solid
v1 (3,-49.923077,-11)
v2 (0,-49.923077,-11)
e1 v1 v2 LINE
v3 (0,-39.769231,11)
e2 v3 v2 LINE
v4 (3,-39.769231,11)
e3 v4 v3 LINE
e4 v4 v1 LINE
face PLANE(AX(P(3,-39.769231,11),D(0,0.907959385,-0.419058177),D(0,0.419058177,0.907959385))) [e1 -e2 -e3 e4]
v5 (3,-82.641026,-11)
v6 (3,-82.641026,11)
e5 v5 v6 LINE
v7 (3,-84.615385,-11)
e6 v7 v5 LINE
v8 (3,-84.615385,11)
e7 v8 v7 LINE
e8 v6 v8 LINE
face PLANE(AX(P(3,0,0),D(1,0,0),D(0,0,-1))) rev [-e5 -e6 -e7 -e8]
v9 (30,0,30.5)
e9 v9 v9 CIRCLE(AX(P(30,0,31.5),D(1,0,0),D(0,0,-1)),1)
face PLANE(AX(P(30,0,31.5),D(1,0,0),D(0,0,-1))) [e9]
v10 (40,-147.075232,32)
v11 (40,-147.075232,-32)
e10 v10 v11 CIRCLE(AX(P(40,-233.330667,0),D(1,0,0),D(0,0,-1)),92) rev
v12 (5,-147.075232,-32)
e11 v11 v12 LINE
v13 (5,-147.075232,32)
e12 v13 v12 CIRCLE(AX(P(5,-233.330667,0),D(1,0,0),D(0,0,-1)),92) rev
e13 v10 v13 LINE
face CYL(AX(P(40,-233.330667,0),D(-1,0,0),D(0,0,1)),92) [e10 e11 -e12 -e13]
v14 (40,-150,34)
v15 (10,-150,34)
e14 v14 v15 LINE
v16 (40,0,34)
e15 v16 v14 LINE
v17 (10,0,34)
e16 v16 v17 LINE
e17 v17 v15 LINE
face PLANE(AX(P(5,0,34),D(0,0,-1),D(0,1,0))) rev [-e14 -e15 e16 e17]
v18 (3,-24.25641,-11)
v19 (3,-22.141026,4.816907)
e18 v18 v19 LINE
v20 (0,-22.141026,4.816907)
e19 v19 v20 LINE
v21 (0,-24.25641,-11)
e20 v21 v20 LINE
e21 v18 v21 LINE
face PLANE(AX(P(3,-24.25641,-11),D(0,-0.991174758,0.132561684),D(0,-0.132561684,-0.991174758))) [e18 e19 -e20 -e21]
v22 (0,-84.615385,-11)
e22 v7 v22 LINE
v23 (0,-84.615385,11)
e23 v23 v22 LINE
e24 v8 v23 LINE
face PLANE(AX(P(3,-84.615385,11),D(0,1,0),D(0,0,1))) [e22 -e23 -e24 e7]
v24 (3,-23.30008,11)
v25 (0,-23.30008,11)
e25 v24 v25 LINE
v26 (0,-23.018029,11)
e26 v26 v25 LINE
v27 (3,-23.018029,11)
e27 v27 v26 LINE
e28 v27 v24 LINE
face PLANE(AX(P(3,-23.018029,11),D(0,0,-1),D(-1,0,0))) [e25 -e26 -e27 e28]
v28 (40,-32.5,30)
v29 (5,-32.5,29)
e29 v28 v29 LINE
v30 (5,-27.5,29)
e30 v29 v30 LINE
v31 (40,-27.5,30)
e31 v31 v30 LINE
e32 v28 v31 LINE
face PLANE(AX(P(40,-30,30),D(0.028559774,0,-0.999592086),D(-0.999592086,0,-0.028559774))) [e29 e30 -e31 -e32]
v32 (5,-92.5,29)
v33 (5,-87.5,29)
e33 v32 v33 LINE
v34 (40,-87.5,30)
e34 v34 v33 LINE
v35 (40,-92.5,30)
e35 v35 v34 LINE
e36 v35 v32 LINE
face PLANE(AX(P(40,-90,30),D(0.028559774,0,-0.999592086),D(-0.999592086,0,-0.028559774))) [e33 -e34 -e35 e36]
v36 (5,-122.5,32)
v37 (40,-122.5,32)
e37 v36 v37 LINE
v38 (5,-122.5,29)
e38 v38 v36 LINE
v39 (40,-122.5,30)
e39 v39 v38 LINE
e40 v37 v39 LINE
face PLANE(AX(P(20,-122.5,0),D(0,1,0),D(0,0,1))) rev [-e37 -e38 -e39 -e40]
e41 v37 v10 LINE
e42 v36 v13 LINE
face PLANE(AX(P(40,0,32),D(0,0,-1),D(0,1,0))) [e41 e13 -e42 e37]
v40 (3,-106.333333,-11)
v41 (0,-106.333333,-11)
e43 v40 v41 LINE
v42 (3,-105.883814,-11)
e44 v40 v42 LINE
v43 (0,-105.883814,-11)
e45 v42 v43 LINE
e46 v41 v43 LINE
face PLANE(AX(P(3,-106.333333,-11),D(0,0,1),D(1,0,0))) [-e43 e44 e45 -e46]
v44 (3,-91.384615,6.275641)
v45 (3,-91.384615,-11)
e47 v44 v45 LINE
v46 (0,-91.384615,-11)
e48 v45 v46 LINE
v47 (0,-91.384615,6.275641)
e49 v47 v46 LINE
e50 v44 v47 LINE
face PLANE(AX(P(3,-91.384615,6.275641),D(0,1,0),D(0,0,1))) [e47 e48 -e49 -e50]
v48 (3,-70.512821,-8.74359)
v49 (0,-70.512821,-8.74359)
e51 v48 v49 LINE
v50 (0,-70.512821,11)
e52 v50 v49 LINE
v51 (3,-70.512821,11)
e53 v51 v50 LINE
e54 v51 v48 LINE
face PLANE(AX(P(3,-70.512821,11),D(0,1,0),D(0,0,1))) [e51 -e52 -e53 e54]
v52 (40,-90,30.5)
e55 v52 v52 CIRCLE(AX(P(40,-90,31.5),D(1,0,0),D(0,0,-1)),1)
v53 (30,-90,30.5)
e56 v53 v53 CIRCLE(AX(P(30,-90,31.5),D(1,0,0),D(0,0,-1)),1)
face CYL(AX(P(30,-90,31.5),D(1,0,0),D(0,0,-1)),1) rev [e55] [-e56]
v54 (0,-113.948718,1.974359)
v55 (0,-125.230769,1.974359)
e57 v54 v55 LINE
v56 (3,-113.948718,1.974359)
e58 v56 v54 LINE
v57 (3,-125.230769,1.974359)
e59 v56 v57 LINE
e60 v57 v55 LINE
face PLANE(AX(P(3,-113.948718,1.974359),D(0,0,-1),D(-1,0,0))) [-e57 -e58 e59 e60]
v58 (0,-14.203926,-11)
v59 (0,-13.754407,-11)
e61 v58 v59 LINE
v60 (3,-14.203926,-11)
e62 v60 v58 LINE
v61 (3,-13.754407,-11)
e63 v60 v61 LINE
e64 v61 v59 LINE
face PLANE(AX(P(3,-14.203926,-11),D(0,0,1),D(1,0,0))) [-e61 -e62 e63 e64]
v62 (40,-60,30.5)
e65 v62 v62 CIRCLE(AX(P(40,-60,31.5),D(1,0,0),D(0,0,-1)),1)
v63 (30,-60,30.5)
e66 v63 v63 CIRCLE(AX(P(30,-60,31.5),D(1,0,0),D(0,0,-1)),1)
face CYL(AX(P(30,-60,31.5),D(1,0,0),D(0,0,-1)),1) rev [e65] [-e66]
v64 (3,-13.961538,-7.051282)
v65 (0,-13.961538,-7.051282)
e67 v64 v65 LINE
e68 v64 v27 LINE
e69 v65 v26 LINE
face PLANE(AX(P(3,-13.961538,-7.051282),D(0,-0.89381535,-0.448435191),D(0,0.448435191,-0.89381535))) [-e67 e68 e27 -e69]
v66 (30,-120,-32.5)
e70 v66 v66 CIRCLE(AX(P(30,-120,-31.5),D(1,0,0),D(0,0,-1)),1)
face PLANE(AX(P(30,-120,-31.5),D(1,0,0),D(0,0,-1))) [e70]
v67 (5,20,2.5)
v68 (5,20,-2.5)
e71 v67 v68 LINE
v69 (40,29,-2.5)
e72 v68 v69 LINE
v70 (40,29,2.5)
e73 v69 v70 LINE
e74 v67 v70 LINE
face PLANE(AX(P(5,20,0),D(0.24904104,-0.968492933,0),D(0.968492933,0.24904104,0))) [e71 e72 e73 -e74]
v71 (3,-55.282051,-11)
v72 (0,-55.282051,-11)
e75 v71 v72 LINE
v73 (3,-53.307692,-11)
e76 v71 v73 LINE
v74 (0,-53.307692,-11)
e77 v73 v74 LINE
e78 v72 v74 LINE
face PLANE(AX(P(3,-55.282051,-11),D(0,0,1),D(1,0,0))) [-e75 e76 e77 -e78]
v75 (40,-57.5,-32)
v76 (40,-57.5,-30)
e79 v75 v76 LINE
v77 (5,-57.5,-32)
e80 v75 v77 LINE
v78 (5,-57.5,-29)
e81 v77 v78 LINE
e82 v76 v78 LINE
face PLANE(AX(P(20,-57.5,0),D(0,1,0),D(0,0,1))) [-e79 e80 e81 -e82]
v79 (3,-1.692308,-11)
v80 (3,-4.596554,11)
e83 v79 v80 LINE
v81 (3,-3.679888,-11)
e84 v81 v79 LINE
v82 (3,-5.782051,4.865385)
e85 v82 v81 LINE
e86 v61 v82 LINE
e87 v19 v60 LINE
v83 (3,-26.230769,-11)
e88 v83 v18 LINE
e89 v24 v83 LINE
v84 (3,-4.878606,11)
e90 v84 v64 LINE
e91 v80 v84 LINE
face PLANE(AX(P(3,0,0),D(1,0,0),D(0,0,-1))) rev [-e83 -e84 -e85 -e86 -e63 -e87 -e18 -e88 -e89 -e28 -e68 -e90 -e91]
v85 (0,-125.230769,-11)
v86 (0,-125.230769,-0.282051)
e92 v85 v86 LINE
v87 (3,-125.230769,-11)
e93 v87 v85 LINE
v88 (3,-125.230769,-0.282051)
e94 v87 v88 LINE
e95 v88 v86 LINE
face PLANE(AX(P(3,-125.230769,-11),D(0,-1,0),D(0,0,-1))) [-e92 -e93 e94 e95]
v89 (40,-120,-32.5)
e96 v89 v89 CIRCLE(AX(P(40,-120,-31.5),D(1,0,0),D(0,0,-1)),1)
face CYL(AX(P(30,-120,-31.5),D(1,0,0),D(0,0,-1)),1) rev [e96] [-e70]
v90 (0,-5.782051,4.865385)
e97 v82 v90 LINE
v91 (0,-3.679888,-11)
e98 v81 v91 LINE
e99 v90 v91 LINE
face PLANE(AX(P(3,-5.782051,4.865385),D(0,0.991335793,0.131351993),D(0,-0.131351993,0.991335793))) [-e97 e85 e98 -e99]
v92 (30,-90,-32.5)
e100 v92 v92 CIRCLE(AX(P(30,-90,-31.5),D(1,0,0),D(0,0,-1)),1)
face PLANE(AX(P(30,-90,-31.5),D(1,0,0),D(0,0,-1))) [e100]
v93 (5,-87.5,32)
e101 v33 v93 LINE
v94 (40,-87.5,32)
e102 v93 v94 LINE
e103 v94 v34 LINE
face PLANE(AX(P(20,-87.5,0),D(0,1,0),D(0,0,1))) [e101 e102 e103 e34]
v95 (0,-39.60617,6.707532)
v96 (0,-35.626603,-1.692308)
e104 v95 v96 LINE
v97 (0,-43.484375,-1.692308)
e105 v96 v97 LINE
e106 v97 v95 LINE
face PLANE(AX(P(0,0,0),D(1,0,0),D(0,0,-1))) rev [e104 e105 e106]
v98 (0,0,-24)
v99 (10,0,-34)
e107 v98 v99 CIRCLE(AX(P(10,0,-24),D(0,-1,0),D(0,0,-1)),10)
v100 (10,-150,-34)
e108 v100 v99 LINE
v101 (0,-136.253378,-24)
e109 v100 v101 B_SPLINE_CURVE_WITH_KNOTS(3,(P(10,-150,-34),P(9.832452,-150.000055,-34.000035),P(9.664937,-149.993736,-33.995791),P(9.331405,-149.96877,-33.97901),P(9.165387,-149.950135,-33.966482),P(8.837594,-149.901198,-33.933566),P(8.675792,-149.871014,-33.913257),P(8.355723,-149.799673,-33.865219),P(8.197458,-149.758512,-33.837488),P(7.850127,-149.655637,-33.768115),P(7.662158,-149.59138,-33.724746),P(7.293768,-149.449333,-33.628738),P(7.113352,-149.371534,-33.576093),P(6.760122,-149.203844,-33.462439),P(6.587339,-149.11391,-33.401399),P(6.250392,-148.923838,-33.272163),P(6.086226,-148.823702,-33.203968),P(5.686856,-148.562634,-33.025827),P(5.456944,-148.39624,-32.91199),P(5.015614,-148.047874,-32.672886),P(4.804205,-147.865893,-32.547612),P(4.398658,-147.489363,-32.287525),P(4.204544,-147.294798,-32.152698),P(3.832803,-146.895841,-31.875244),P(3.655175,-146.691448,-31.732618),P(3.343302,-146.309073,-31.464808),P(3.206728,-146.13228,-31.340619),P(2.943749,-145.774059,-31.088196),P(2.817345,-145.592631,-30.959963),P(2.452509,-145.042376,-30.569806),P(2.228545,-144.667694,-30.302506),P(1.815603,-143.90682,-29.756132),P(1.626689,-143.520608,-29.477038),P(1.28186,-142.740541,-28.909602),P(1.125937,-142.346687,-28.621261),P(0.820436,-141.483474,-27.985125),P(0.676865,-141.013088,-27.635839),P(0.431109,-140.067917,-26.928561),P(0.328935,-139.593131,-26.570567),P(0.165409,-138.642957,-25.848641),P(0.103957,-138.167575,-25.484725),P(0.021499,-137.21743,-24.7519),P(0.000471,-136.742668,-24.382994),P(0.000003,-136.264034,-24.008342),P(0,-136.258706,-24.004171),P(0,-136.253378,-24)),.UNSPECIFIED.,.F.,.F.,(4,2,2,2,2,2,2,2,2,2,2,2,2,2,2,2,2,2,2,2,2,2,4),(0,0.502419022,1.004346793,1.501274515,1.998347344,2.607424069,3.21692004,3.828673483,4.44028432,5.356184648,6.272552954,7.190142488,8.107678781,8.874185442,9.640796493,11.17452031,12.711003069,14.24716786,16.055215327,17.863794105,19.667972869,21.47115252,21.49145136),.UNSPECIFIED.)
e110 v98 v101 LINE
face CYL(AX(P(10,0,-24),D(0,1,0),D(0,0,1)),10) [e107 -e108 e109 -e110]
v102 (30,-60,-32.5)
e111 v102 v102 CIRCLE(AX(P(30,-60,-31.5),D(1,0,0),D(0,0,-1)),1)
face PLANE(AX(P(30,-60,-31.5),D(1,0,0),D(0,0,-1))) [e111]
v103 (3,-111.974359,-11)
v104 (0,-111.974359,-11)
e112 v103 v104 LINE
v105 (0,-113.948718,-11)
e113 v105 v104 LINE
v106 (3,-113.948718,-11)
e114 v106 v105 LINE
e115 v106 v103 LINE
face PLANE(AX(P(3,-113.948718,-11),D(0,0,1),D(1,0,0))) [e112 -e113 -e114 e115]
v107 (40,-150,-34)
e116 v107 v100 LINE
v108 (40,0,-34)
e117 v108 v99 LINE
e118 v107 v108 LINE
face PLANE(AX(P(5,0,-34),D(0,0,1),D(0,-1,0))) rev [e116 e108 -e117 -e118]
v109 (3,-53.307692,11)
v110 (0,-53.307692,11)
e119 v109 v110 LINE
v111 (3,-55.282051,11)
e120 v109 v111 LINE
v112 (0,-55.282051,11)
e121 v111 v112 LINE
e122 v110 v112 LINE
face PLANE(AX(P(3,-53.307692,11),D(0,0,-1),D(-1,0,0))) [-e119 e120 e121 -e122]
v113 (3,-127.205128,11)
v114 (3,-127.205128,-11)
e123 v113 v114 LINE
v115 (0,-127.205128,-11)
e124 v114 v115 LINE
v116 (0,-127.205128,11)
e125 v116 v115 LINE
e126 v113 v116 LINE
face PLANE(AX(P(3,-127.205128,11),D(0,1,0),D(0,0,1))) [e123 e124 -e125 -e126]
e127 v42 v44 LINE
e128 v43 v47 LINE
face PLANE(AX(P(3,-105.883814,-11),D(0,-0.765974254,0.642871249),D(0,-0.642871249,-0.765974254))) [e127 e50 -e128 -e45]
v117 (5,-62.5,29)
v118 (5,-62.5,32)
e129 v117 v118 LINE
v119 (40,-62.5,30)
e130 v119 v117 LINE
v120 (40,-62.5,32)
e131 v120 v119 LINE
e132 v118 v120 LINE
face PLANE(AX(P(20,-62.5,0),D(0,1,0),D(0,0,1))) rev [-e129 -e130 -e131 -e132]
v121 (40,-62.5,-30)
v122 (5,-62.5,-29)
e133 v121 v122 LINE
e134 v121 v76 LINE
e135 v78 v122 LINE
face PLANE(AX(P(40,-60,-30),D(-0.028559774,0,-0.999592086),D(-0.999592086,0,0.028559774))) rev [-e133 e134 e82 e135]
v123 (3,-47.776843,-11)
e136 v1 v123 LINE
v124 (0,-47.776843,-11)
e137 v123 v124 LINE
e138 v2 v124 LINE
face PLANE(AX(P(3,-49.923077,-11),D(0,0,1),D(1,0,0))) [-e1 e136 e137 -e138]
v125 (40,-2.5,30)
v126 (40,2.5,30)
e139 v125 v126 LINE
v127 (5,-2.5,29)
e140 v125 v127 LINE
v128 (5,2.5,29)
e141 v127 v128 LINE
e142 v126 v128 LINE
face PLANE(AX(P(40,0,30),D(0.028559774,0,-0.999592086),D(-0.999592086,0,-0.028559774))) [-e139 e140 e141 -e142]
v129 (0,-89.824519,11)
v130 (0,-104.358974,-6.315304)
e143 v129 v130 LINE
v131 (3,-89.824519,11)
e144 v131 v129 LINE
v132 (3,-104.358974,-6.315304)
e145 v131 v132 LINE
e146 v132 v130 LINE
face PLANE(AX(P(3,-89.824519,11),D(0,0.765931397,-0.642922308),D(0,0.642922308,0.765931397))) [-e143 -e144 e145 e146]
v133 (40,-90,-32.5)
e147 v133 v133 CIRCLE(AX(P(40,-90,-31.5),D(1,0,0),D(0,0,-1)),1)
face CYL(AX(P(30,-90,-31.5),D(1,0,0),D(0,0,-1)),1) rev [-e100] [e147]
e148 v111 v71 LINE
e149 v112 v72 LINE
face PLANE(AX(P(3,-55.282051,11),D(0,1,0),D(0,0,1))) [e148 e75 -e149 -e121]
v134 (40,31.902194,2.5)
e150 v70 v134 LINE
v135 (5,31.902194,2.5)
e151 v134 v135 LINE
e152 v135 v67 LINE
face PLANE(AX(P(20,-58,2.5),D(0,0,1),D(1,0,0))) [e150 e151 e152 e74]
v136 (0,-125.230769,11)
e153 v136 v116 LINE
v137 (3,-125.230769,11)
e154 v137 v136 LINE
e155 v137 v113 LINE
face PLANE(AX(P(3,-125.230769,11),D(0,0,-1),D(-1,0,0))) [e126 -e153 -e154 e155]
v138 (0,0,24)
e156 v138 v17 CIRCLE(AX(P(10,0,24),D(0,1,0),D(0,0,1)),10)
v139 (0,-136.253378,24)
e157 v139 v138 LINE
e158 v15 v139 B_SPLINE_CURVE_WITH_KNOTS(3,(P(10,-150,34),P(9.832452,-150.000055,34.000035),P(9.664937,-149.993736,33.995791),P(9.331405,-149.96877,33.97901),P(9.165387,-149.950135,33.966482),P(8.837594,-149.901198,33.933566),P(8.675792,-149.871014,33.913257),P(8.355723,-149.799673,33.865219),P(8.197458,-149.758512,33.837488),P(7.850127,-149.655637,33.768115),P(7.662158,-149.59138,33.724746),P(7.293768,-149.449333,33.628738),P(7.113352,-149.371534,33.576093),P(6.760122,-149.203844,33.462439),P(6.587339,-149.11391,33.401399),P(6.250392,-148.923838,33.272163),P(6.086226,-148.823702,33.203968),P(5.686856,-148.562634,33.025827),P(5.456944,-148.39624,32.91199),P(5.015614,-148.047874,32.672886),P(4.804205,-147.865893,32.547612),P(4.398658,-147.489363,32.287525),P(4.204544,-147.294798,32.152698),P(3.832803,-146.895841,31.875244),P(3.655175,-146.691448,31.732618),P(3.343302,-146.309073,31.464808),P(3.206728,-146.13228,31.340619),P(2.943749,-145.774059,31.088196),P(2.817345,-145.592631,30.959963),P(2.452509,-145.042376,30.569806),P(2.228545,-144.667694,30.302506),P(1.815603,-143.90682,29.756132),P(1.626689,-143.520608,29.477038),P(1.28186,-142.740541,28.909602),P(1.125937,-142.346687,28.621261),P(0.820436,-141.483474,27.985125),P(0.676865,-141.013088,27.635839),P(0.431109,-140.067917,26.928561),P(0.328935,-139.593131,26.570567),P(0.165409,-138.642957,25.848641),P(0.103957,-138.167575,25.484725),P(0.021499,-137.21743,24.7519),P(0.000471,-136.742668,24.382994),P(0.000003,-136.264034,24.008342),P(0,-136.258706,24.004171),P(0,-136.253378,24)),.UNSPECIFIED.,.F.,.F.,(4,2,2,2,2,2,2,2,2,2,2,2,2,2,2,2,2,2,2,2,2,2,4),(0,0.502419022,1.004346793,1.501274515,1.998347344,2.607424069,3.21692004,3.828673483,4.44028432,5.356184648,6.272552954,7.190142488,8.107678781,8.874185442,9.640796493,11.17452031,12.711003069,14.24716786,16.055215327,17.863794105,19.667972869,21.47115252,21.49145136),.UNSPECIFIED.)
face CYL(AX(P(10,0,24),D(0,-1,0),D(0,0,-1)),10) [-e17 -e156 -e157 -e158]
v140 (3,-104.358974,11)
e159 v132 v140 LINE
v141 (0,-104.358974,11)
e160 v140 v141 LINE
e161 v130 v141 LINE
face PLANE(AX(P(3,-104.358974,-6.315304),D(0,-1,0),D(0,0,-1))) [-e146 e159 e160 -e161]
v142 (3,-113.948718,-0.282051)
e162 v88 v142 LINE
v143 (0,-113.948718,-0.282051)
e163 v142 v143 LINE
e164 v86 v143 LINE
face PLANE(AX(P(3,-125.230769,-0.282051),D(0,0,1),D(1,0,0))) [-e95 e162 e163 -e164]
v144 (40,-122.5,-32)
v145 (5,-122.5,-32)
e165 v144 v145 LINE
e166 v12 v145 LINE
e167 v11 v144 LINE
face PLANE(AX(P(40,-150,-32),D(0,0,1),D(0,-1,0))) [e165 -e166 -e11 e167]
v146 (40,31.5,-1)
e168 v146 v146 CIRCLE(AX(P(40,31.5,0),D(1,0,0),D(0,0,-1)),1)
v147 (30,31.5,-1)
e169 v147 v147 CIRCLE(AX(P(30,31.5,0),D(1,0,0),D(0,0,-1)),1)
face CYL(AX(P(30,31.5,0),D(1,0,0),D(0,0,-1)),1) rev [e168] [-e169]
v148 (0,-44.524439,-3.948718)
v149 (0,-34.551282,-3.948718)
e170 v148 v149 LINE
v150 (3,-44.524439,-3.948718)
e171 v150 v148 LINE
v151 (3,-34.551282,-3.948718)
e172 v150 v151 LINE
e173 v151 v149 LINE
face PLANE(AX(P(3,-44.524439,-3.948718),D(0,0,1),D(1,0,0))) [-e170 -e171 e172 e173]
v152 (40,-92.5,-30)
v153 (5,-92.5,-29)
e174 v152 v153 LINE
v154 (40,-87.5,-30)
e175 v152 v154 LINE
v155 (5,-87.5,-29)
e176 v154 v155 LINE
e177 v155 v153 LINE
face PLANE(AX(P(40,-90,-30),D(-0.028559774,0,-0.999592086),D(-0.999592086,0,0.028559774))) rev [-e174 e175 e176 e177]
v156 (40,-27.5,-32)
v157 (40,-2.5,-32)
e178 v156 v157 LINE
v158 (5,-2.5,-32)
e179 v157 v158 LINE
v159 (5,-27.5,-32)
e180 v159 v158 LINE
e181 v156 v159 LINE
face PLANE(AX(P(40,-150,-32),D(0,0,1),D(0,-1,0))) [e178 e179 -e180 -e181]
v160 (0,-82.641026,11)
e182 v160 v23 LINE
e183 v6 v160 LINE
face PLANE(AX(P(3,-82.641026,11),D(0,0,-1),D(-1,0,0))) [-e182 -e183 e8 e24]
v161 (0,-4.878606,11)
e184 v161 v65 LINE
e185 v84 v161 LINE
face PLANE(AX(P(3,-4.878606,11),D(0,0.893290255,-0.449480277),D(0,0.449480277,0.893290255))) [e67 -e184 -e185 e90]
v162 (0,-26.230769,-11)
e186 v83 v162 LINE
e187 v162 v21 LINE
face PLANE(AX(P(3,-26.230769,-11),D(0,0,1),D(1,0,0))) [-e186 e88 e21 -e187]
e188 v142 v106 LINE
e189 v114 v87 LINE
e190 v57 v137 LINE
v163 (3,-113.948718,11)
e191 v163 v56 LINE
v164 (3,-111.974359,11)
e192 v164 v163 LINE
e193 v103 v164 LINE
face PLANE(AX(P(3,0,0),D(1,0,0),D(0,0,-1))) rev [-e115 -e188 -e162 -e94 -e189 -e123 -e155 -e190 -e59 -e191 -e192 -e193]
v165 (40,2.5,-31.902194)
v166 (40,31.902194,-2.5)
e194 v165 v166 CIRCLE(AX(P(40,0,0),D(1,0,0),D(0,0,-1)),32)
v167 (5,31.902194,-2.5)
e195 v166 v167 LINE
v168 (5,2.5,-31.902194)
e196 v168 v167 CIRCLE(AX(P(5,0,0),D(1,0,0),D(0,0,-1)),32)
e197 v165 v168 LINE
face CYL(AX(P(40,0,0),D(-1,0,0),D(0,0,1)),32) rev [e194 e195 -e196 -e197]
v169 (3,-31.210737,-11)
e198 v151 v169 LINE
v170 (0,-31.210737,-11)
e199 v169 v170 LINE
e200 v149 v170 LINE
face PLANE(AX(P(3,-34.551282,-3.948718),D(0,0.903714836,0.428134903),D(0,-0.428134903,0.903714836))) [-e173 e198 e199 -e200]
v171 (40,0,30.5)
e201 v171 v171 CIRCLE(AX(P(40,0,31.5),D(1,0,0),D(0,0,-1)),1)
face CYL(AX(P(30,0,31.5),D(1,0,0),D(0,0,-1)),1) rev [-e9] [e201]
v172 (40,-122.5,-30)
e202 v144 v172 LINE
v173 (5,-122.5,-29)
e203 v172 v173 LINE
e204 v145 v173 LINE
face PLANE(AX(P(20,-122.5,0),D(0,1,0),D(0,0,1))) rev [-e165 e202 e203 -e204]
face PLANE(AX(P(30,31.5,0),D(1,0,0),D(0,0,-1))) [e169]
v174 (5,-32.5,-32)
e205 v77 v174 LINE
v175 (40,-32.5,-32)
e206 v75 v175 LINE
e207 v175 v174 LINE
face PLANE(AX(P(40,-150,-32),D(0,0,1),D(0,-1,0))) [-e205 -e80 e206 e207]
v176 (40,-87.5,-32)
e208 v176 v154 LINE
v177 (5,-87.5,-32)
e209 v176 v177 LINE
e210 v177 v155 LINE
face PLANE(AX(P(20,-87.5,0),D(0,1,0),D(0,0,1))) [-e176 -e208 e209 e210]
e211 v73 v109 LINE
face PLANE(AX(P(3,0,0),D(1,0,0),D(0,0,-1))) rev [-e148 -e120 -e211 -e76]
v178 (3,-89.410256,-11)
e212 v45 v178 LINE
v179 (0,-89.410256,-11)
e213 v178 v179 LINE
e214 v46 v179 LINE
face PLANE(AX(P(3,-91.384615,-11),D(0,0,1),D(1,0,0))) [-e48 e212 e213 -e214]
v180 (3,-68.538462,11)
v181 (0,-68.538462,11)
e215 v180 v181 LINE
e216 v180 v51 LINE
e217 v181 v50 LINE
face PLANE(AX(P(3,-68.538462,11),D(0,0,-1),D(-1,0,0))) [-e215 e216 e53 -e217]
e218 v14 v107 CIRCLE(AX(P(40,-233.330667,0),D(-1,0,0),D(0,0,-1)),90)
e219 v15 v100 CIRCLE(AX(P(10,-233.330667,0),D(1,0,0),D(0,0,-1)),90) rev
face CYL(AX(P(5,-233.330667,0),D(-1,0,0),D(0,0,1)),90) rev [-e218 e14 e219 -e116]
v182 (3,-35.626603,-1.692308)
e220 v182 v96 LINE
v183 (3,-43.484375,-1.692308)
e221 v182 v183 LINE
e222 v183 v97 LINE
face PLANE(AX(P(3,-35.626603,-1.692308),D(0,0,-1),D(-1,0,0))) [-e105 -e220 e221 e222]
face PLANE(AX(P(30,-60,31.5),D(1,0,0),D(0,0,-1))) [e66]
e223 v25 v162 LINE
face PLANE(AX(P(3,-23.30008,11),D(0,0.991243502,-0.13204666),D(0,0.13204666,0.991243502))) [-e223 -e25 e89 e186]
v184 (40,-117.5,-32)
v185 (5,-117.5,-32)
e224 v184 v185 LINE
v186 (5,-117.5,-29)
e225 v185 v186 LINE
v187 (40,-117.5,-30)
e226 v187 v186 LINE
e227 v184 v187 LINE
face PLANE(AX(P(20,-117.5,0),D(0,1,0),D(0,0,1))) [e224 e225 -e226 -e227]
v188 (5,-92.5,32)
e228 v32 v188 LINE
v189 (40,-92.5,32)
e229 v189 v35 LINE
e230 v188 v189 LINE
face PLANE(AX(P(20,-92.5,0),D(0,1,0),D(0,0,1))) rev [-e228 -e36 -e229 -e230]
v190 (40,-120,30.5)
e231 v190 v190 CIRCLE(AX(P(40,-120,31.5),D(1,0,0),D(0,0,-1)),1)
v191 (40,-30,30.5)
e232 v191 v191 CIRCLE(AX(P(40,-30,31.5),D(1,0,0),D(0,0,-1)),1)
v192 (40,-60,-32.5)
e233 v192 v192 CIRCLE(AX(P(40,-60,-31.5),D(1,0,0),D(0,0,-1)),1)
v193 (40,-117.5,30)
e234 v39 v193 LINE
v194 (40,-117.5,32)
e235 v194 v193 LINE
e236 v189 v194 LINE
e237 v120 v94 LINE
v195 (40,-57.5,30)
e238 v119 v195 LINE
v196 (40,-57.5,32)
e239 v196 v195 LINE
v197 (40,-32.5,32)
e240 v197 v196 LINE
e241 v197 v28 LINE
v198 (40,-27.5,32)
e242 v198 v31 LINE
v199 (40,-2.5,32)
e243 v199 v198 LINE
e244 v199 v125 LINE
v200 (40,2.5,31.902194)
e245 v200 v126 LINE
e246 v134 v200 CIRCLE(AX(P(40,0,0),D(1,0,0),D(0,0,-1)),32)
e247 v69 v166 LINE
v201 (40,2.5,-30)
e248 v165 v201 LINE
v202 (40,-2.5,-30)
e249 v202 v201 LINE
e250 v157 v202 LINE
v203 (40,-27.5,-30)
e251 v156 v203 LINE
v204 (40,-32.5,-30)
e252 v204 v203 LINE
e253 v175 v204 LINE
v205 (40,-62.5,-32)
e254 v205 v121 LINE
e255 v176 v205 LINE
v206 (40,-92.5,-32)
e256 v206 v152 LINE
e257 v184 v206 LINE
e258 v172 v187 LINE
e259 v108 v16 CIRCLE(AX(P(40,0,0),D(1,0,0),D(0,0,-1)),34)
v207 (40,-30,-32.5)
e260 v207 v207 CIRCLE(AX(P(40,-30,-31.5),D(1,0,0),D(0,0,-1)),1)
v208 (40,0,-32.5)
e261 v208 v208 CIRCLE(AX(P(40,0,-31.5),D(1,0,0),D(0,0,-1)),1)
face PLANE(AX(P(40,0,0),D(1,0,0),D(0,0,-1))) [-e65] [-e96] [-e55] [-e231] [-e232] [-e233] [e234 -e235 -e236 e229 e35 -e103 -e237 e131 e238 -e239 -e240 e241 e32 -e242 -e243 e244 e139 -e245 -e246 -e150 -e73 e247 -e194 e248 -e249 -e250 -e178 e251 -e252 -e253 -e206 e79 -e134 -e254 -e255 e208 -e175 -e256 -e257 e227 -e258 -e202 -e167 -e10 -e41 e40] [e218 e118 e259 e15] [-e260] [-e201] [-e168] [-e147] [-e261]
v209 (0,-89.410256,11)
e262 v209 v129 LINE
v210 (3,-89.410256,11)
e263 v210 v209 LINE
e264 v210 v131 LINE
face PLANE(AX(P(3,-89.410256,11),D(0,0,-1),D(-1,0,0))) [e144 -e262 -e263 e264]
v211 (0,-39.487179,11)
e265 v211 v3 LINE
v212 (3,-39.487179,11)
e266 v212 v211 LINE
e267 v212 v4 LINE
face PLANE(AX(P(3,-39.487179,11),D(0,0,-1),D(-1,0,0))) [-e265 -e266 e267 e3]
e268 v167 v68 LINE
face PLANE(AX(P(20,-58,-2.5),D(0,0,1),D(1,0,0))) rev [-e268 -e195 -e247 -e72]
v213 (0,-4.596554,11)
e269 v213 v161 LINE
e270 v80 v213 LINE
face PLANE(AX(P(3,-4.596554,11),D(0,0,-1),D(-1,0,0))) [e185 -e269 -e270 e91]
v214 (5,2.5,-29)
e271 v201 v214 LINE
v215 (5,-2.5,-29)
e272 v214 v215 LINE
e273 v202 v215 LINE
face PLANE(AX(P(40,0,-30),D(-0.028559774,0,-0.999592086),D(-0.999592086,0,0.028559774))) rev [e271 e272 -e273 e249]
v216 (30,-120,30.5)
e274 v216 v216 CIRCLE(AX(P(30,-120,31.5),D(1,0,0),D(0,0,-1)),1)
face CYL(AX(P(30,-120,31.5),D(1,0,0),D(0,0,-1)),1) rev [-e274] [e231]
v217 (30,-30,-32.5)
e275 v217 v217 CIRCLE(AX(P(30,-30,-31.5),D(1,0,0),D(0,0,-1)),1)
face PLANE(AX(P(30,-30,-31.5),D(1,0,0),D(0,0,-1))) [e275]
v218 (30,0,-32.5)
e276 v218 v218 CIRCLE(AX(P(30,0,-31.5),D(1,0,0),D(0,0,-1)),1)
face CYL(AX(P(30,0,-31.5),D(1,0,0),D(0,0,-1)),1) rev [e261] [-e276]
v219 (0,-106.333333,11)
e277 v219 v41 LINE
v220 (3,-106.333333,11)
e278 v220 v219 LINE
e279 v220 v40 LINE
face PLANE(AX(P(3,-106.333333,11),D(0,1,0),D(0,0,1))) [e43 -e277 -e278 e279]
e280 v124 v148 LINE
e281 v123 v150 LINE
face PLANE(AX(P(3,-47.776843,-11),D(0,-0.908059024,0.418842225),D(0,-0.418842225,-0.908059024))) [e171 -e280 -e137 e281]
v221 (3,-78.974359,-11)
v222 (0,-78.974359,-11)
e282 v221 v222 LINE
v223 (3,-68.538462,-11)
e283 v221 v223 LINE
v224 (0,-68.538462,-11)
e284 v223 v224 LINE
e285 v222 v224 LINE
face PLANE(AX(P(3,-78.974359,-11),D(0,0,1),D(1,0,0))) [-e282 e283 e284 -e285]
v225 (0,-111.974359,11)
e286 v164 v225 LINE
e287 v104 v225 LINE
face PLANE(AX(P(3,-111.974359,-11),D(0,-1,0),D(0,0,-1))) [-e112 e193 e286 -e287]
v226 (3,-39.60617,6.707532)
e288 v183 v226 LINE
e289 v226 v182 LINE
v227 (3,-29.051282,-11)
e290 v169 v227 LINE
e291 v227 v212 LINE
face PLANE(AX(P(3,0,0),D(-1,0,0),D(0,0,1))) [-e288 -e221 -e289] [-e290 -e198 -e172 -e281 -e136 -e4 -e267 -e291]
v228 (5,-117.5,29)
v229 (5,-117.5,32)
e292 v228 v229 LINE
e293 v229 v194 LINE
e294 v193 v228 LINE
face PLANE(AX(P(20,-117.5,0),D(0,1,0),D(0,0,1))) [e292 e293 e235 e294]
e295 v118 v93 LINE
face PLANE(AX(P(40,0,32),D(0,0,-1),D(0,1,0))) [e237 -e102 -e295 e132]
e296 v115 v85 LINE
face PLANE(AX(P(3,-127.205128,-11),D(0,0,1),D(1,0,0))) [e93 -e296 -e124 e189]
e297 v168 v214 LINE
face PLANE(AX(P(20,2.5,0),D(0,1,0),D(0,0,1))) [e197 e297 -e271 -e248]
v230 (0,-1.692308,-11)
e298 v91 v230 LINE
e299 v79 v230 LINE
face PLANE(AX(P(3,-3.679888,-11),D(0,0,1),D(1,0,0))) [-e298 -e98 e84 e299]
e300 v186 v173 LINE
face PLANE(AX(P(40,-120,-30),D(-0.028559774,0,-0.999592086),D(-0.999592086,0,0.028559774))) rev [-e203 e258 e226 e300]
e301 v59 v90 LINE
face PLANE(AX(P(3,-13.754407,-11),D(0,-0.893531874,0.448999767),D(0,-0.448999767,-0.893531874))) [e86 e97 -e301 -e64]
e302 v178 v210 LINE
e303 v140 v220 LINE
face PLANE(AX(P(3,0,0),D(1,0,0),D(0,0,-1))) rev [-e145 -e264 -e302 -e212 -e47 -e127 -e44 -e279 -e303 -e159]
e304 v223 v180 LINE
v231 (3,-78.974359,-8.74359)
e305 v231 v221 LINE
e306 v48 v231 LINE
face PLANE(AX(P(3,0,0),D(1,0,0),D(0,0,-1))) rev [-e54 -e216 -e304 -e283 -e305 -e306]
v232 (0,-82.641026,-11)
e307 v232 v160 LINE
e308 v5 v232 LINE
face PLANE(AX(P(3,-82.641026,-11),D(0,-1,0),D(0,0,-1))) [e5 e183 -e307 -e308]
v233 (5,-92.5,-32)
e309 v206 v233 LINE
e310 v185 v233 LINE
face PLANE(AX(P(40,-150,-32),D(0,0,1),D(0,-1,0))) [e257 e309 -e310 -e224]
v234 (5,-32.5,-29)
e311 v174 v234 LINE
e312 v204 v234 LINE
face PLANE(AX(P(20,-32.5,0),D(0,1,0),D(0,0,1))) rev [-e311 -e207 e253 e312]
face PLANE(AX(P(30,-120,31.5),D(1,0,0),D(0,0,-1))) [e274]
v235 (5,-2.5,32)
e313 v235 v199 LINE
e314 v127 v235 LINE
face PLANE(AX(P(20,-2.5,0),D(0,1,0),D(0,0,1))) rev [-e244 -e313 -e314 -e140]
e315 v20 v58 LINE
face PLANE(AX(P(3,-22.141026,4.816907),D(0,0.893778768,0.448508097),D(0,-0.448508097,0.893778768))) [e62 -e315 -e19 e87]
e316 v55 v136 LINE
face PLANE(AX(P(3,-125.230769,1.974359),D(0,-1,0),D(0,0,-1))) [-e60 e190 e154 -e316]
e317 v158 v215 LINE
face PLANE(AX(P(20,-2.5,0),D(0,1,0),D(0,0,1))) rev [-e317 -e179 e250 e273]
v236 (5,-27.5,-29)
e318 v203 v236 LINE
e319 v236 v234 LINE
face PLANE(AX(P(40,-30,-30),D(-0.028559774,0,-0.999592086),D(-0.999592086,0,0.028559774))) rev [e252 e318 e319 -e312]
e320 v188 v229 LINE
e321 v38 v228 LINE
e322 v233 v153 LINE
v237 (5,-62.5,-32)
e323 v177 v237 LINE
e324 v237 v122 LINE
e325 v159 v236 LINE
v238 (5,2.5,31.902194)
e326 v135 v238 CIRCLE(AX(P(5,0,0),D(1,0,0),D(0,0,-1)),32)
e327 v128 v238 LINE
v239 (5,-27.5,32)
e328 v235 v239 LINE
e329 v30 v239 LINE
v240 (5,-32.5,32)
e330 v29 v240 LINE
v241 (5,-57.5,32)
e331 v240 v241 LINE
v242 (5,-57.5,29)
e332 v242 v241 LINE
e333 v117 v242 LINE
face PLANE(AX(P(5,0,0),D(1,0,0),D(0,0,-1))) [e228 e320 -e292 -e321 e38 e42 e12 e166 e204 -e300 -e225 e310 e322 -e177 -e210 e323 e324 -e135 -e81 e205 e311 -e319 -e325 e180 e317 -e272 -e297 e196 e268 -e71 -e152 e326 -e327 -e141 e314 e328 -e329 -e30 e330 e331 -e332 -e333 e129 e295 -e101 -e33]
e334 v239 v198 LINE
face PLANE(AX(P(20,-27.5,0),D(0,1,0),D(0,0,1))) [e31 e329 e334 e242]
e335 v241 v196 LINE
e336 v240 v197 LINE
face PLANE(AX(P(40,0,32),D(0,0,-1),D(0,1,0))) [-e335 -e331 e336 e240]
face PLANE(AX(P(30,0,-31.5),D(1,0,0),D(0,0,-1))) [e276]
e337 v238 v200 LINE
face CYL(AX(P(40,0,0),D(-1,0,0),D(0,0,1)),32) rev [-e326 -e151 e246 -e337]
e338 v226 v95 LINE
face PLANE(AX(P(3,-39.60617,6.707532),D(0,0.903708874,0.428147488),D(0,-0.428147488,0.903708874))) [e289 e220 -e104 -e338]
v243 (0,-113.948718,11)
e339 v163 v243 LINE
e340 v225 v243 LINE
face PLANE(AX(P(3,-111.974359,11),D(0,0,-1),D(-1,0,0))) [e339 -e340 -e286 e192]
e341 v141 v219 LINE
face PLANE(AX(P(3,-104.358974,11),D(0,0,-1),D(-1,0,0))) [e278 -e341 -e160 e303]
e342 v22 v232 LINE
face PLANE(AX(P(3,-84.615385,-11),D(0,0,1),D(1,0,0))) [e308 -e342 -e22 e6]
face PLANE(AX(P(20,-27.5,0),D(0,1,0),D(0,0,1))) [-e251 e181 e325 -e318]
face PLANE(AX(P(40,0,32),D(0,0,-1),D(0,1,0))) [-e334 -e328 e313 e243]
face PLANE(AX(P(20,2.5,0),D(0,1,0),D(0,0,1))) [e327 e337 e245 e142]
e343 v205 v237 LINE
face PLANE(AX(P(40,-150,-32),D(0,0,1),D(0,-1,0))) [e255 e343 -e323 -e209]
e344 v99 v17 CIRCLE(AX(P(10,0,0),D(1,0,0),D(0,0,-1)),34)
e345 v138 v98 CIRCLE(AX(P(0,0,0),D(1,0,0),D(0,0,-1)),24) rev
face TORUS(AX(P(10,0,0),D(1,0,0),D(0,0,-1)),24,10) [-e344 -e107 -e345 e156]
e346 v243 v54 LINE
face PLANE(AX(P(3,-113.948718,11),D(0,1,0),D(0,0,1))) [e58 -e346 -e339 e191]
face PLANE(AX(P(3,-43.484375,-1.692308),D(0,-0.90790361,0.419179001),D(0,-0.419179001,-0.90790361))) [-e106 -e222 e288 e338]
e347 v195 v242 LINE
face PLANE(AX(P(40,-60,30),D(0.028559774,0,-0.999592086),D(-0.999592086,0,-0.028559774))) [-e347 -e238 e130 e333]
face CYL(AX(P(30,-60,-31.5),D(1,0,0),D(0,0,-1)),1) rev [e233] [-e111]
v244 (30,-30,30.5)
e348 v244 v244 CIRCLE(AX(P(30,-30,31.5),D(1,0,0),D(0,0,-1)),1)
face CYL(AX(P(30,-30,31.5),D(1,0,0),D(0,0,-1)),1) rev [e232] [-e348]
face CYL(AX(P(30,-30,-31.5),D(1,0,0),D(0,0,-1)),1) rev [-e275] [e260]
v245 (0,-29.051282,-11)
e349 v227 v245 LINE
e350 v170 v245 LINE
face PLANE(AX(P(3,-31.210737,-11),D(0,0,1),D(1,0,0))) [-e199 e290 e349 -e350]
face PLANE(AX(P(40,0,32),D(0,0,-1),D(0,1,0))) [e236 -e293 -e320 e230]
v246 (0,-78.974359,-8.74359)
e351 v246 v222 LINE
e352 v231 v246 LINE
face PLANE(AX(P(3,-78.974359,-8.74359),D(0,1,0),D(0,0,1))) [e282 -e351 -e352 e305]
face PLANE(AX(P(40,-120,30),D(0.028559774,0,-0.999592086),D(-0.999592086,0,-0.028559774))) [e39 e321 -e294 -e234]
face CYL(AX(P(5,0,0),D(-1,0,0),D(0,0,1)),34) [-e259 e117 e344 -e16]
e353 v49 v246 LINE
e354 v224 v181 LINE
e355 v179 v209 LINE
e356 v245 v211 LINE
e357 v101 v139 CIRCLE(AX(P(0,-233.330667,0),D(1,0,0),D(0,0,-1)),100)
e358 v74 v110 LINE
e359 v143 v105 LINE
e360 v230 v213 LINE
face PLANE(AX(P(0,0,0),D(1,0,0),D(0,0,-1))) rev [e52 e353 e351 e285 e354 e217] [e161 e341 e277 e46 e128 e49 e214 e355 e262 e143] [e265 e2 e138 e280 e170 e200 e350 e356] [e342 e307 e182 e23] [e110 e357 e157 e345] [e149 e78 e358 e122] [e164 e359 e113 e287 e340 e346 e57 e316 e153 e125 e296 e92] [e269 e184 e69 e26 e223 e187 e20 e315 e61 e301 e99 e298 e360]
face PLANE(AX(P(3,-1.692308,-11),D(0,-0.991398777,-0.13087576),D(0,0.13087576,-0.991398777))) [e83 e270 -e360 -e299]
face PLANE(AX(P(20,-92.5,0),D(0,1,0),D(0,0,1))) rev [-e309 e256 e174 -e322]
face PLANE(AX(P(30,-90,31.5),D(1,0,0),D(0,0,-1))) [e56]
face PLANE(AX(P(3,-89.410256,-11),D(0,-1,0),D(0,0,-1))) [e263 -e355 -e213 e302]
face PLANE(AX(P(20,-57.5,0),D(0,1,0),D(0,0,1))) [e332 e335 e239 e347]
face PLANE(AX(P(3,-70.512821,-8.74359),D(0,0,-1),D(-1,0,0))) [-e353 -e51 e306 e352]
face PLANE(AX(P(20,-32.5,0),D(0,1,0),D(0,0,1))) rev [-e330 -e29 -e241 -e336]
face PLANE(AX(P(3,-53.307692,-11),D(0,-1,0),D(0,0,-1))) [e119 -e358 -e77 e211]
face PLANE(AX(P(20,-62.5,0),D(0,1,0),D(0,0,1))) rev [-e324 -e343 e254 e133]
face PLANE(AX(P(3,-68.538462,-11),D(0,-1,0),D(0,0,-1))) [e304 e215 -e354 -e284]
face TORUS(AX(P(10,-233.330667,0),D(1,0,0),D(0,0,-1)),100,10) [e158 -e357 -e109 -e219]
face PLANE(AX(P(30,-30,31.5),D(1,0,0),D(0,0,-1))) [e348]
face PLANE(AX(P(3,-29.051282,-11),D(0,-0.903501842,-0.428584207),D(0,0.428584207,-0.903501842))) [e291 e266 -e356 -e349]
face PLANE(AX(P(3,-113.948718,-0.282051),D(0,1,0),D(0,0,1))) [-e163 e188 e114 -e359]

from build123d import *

# Parameters (mm, degrees)
BOSS_EXTRUDE3_DEPTH  = 5
EXTRUDE_THIN3_DEPTH  = 35
RIB3_START           = -2.5
RIB3_DEPTH           = 5
RIB13_START          = -2.5
RIB13_DEPTH          = 5
LPATTERN1_COUNT      = 5
LPATTERN1_PITCH      = 30
MIRROR1_START        = -2.5
MIRROR1_COPY_1_DEPTH = 5
MIRROR1_COPY_2_DEPTH = 5
MIRROR1_COPY_3_DEPTH = 5
MIRROR1_COPY_4_DEPTH = 5
CUT_EXTRUDE1_START   = -40
SKETCH11_R           = 1
CUT_EXTRUDE1_DEPTH   = 10
FILLET2_R            = 10
SKETCH12_W           = 22
SKETCH12_H           = 1.974358974
CUT_EXTRUDE2_DEPTH   = 3


# Read off the part's stored shape, not the designer's step: Rib3, Rib13
with BuildPart() as part:
    # Sketch7 → Boss-Extrude3 (new body)
    with BuildSketch(Plane(origin=(0, 0, 0), x_dir=(0, 0, -1), z_dir=(1, 0, 0))):
        with BuildLine():
            Line((-34, 0), (-34, -150))
            ThreePointArc((-34, -150), (0, -143.330666624), (34, -150))
            Line((34, -150), (34, 0))
            ThreePointArc((34, 0), (0, 34), (-34, 0))
        make_face()
    extrude(amount=BOSS_EXTRUDE3_DEPTH)

    # Sketch10 → Extrude-Thin3 (add)
    with BuildSketch(Plane(origin=(5, 0, 0), x_dir=(0, 0, -1), z_dir=(1, 0, 0))):
        with BuildLine():
            Line((34, -150), (34, 0))
            ThreePointArc((34, 0), (0, 34), (-34, 0))
            Line((-34, 0), (-34, -150))
            ThreePointArc((-34, -150), (0, -143.330666624), (34, -150))
        make_face()
        with BuildLine():
            Line((32, -147.075232013), (32, 0))
            ThreePointArc((32, 0), (0, 32), (-32, 0))
            Line((-32, 0), (-32, -147.075232013))
            ThreePointArc((-32, -147.075232013), (0, -141.330666624), (32, -147.075232013))
        make_face(mode=Mode.SUBTRACT)
    extrude(amount=EXTRUDE_THIN3_DEPTH)

    # Rib3 outline → Rib3 (add)
    with BuildSketch(Plane.XY.offset(RIB3_START)):
        Polygon((5, 20), (40, 29), (40, 33), (4, 33), (4, 19.742857143), align=None)
    extrude(amount=RIB3_DEPTH)

    # Rib13 outline → Rib13 (add)
    with BuildSketch(Plane(origin=(0, 0, 0), x_dir=(1, 0, 0), z_dir=(0, 1, 0)).offset(RIB13_START)):
        Polygon((5, -32), (40, -32), (40, -30), (5, -29), align=None)
    rib13 = extrude(amount=RIB13_DEPTH)

    # LPattern1: Rib13 ×5
    with Locations(*[(0, -i * LPATTERN1_PITCH, 0) for i in range(1, LPATTERN1_COUNT)]):
        add(rib13)

    # Mirror1: Rib13 across plane
    add(rib13.mirror(Plane.XY))

    # Mirror1 copy 1 sketch → Mirror1 copy 1 (add)
    with BuildSketch(Plane(origin=(0, -30, 0), x_dir=(1, 0, 0), z_dir=(0, 1, 0)).offset(MIRROR1_START)):
        Polygon((5, 32), (40, 32), (40, 30), (5, 29), align=None)
    extrude(amount=MIRROR1_COPY_1_DEPTH)

    # Mirror1 copy 2 sketch → Mirror1 copy 2 (add)
    with BuildSketch(Plane(origin=(0, -60, 0), x_dir=(1, 0, 0), z_dir=(0, 1, 0)).offset(MIRROR1_START)):
        Polygon((5, 32), (40, 32), (40, 30), (5, 29), align=None)
    extrude(amount=MIRROR1_COPY_2_DEPTH)

    # Mirror1 copy 3 sketch → Mirror1 copy 3 (add)
    with BuildSketch(Plane(origin=(0, -90, 0), x_dir=(1, 0, 0), z_dir=(0, 1, 0)).offset(MIRROR1_START)):
        Polygon((5, 32), (40, 32), (40, 30), (5, 29), align=None)
    extrude(amount=MIRROR1_COPY_3_DEPTH)

    # Mirror1 copy 4 sketch → Mirror1 copy 4 (add)
    with BuildSketch(Plane(origin=(0, -120, 0), x_dir=(1, 0, 0), z_dir=(0, 1, 0)).offset(MIRROR1_START)):
        Polygon((5, 32), (40, 32), (40, 30), (5, 29), align=None)
    extrude(amount=MIRROR1_COPY_4_DEPTH)

    # Sketch11 → Cut-Extrude1 (cut)
    with BuildSketch(Plane.ZY.offset(CUT_EXTRUDE1_START)):
        with Locations(Location((-31.5, 0, 0), (0, 0, 180))):
            Circle(SKETCH11_R)
        with Locations(Location((31.5, 0, 0), (0, 0, 180))):
            Circle(SKETCH11_R)
        with Locations(Location((-31.5, -30, 0), (0, 0, 180))):
            Circle(SKETCH11_R)
        with Locations(Location((31.5, -30, 0), (0, 0, 180))):
            Circle(SKETCH11_R)
        with Locations(Location((-31.5, -60, 0), (0, 0, 180))):
            Circle(SKETCH11_R)
        with Locations(Location((31.5, -60, 0), (0, 0, 180))):
            Circle(SKETCH11_R)
        with Locations(Location((-31.5, -90, 0), (0, 0, 180))):
            Circle(SKETCH11_R)
        with Locations(Location((31.5, -90, 0), (0, 0, 180))):
            Circle(SKETCH11_R)
        with Locations(Location((-31.5, -120, 0), (0, 0, 180))):
            Circle(SKETCH11_R)
        with Locations(Location((31.5, -120, 0), (0, 0, 180))):
            Circle(SKETCH11_R)
        with Locations(Location((0, 31.5, 0), (0, 0, 180))):
            Circle(SKETCH11_R)
    extrude(amount=CUT_EXTRUDE1_DEPTH, mode=Mode.SUBTRACT)

    # Fillet2
    fillet2_edges = [part.edges().sort_by_distance(p)[0] for p in [
        (0, -75, -34),
        (0, -143.330666624, 0),
        (0, -75, 34),
        (0, 34, 0),
    ]]
    fillet(fillet2_edges, radius=FILLET2_R)

    # Sketch12 → Cut-Extrude2 (cut)
    # profile 1 of 7: a face of its own
    with BuildSketch(Plane.ZY):
        Polygon((-11, -1.692307692), (11, -4.596554487), (11, -4.878605769), (-7.051282051, -13.961538462), (11, -23.018028846), (11, -23.300080128), (-11, -26.230769231), (-11, -24.256410256), (4.816907051, -22.141025641), (-11, -14.203926282), (-11, -13.754407051), (4.865384615, -5.782051282), (-11, -3.679887821), align=None)
    # profile 2 of 7: a face of its own
    with BuildSketch(Plane.ZY):
        Polygon((11, -39.769230769), (-11, -49.923076923), (-11, -47.776842949), (-3.948717949, -44.524439103), (-3.948717949, -34.551282051), (-11, -31.210737179), (-11, -29.051282051), (11, -39.487179487), align=None)
        Polygon((6.707532051, -39.606169872), (-1.692307692, -35.626602564), (-1.692307692, -43.484375), align=None, mode=Mode.SUBTRACT)
    # profile 3 of 7: a face of its own
    with BuildSketch(Plane.ZY):
        with Locations((0, -54.294871795)):
            Rectangle(SKETCH12_W, SKETCH12_H)
    # profile 4 of 7: a face of its own
    with BuildSketch(Plane.ZY):
        Polygon((11, -68.538461538), (11, -70.512820513), (-8.743589744, -70.512820513), (-8.743589744, -78.974358974), (-11, -78.974358974), (-11, -68.538461538), align=None)
    # profile 5 of 7: a face of its own
    with BuildSketch(Plane.ZY):
        with Locations((0, -83.628205128)):
            Rectangle(SKETCH12_W, SKETCH12_H)
    # profile 6 of 7: a face of its own
    with BuildSketch(Plane.ZY):
        Polygon((-11, -89.41025641), (11, -89.41025641), (11, -89.824519231), (-6.315304487, -104.358974359), (11, -104.358974359), (11, -106.333333333), (-11, -106.333333333), (-11, -105.883814103), (6.275641026, -91.384615385), (-11, -91.384615385), align=None)
    # profile 7 of 7: a face of its own
    with BuildSketch(Plane.ZY):
        Polygon((11, -111.974358974), (11, -113.948717949), (1.974358974, -113.948717949), (1.974358974, -125.230769231), (11, -125.230769231), (11, -127.205128205), (-11, -127.205128205), (-11, -125.230769231), (-0.282051282, -125.230769231), (-0.282051282, -113.948717949), (-11, -113.948717949), (-11, -111.974358974), align=None)
    extrude(amount=-CUT_EXTRUDE2_DEPTH, mode=Mode.SUBTRACT)


solid = part.part
